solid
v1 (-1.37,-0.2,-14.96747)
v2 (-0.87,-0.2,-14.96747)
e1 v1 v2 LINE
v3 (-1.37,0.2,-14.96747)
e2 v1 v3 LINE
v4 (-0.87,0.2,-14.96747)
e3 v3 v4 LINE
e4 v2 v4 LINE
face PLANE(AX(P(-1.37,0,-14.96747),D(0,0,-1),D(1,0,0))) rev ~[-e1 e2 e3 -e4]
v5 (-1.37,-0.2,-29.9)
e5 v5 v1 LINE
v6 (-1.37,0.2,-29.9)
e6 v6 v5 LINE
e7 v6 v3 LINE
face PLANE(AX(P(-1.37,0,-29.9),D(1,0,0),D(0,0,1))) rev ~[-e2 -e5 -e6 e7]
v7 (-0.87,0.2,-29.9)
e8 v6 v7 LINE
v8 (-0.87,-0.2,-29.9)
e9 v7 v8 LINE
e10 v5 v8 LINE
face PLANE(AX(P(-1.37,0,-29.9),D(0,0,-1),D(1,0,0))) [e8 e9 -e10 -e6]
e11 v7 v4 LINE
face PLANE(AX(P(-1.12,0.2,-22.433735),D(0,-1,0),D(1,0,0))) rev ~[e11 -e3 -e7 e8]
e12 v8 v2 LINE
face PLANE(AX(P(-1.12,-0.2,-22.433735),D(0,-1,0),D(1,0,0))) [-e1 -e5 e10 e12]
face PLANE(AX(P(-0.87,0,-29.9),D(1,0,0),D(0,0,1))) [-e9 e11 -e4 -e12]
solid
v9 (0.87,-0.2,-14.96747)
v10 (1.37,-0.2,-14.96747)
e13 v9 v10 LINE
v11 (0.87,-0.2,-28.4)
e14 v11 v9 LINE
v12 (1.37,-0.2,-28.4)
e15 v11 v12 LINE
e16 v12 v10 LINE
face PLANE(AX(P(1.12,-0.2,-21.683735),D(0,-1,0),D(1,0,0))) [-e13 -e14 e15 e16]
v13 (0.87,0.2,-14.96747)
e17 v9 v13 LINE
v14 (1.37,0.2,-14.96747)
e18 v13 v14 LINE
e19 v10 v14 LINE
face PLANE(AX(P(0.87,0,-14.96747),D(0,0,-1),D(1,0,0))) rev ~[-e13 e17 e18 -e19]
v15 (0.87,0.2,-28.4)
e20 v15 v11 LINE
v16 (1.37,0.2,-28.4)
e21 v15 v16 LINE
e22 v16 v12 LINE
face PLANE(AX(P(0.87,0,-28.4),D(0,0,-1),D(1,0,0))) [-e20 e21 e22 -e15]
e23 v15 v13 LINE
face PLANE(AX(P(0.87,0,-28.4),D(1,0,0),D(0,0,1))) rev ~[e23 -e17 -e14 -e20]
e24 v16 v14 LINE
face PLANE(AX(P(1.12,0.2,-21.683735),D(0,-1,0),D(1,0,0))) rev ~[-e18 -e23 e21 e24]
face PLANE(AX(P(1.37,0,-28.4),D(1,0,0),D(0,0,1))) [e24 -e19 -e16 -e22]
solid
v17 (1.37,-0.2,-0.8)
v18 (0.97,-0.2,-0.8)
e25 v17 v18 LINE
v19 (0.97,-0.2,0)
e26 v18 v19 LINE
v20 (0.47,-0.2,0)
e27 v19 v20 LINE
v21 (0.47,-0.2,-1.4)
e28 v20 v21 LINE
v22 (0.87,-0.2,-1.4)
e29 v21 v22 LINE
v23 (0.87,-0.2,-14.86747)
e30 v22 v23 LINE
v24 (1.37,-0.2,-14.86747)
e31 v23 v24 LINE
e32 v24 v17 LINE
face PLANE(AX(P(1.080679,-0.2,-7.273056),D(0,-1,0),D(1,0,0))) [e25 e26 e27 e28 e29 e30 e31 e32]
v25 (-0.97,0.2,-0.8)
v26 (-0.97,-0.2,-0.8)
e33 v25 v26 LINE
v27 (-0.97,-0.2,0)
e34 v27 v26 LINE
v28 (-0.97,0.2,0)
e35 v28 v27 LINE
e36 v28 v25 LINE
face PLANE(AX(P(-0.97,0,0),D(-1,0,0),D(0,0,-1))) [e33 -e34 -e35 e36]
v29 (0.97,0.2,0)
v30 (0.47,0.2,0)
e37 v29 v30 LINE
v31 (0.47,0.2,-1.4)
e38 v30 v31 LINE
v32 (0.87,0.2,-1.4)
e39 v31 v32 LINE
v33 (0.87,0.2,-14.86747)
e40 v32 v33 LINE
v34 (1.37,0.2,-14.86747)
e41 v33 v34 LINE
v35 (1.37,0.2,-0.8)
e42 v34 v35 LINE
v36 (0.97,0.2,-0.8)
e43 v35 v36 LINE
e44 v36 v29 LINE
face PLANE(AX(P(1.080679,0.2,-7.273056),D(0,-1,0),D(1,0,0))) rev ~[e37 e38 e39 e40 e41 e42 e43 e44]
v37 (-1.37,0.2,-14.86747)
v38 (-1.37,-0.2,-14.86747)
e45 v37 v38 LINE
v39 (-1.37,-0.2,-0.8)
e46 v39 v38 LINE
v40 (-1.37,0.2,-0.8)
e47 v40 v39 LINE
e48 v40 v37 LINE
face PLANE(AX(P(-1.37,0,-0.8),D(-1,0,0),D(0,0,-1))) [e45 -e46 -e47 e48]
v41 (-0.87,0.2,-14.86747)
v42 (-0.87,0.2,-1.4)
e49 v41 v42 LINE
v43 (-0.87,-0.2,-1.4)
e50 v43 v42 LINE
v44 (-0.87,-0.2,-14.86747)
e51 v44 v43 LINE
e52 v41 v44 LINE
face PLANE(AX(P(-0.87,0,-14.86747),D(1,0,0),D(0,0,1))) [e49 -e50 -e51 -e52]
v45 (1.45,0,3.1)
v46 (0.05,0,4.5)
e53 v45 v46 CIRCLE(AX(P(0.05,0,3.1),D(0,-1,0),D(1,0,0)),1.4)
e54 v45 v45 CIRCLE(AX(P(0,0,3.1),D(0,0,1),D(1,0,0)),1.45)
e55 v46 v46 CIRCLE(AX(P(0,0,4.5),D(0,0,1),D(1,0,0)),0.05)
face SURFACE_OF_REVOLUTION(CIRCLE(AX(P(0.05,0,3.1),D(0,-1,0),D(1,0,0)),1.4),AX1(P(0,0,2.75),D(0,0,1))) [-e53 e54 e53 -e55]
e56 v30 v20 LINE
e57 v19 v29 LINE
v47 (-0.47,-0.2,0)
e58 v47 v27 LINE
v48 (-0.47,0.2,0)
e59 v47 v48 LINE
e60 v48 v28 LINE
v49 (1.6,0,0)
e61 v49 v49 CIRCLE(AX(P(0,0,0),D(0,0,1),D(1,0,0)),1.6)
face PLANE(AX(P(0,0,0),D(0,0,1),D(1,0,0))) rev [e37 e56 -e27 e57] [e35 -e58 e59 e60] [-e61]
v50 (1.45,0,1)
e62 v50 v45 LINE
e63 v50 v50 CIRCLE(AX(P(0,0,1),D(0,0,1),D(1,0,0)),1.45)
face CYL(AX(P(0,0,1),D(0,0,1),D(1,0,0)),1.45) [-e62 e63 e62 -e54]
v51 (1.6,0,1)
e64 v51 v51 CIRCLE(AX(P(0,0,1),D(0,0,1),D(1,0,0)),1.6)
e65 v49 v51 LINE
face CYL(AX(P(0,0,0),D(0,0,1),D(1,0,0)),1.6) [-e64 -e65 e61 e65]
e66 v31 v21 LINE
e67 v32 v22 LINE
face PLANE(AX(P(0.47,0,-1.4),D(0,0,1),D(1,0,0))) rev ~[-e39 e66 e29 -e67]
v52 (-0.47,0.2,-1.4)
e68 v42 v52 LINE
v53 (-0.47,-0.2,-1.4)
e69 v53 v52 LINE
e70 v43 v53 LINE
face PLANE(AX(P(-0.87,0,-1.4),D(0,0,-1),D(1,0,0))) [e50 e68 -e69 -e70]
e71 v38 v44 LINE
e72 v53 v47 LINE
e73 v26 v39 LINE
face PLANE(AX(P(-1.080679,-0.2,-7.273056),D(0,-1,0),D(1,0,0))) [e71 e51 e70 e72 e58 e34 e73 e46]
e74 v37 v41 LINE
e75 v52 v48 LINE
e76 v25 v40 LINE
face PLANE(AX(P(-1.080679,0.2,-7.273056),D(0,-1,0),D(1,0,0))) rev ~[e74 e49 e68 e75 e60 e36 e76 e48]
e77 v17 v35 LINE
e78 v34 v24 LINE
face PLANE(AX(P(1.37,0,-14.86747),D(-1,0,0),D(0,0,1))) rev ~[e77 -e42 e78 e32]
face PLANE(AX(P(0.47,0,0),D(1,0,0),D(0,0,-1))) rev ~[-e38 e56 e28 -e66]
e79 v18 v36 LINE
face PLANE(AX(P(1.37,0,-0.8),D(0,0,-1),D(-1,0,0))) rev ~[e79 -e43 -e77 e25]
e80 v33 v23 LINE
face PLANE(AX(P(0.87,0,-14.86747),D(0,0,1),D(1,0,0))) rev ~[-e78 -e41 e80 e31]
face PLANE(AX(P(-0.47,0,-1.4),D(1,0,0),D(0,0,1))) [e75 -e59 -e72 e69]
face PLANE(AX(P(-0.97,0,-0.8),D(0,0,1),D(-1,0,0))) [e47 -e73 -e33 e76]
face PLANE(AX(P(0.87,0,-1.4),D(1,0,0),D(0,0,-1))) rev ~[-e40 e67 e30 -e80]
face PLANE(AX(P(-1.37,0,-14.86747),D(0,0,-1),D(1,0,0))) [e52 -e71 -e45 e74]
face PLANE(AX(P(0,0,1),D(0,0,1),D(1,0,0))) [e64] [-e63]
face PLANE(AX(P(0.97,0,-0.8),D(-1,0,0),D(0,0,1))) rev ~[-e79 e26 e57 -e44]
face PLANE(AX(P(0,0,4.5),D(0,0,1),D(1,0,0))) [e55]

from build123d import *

# Parameters (mm, degrees)
F2_DEPTH = 0.2
F0_W     = 0.5
F0_H     = 0.1
F3_DEPTH = 0.2
F0_H_2   = 14.9325303316
F4_DEPTH = 0.2
F0_H_3   = 13.4325303316


# Not quite as in the source:
# - the program builds the solid bodies; features that only make, move or delete a surface that nothing else refers to are left out


with BuildPart() as f1:
    # F0 (on Front) → F1 (revolve)
    with BuildSketch(Plane.XZ):
        with BuildLine():
            Line((0, 1), (1.45, 1))
            Line((1.45, 1), (1.45, 3.1))
            ThreePointArc((1.45, 3.1), (1.0399494937, 4.0899494937), (0.05, 4.5))
            Line((0.05, 4.5), (0, 4.5))
            Line((0, 4.5), (0, 1))
        make_face()
        Polygon((1.6, 0), (1.6, 1), (1.45, 1), (0, 1), (0, 0), (0.3817705219, 0), (0.47, 0), (0.97, 0), (1.0582294781, 0), align=None)
    revolve(axis=Axis((0, 0, 2.75), (0, 0, 1)))

    # F0 (on Front) → F2 (join, symmetric)
    with BuildSketch(Plane.XZ):
        Polygon((0.97, -0.65), (0.97, 0), (0.47, 0), (0.47, -0.65), (0.47, -1.4), (0.87, -1.4), (0.87, -14.8674696684), (1.37, -14.8674696684), (1.37, -0.8), (0.97, -0.8), align=None)
        Polygon((-0.47, -0.65), (-0.47, 0), (-0.97, 0), (-0.97, -0.65), (-0.97, -0.8), (-1.37, -0.8), (-1.37, -14.8674696684), (-0.87, -14.8674696684), (-0.87, -1.4), (-0.47, -1.4), align=None)
    extrude(amount=F2_DEPTH, both=True)

    # F0 (on Front) → F3 (cut, symmetric)
    with BuildSketch(Plane.XZ):
        with Locations((1.12, -14.9174696684)):
            Rectangle(F0_W, F0_H)
        with Locations((-1.12, -14.9174696684)):
            Rectangle(F0_W, F0_H)
    extrude(amount=F3_DEPTH, both=True, mode=Mode.SUBTRACT)


with BuildPart() as f4:
    # F0 (on Front) → F4 (new body, symmetric)
    with BuildSketch(Plane.XZ):
        with Locations((-1.12, -22.4337348342)):
            Rectangle(F0_W, F0_H_2)
    extrude(amount=F4_DEPTH, both=True)


with BuildPart() as f4b:
    # F0 (on Front) → F4, piece 2 (new body, symmetric)
    with BuildSketch(Plane.XZ):
        with Locations((1.12, -21.6837348342)):
            Rectangle(F0_W, F0_H_3)
    extrude(amount=F4_DEPTH, both=True)


solid = Compound([f1.part, f4.part, f4b.part])
